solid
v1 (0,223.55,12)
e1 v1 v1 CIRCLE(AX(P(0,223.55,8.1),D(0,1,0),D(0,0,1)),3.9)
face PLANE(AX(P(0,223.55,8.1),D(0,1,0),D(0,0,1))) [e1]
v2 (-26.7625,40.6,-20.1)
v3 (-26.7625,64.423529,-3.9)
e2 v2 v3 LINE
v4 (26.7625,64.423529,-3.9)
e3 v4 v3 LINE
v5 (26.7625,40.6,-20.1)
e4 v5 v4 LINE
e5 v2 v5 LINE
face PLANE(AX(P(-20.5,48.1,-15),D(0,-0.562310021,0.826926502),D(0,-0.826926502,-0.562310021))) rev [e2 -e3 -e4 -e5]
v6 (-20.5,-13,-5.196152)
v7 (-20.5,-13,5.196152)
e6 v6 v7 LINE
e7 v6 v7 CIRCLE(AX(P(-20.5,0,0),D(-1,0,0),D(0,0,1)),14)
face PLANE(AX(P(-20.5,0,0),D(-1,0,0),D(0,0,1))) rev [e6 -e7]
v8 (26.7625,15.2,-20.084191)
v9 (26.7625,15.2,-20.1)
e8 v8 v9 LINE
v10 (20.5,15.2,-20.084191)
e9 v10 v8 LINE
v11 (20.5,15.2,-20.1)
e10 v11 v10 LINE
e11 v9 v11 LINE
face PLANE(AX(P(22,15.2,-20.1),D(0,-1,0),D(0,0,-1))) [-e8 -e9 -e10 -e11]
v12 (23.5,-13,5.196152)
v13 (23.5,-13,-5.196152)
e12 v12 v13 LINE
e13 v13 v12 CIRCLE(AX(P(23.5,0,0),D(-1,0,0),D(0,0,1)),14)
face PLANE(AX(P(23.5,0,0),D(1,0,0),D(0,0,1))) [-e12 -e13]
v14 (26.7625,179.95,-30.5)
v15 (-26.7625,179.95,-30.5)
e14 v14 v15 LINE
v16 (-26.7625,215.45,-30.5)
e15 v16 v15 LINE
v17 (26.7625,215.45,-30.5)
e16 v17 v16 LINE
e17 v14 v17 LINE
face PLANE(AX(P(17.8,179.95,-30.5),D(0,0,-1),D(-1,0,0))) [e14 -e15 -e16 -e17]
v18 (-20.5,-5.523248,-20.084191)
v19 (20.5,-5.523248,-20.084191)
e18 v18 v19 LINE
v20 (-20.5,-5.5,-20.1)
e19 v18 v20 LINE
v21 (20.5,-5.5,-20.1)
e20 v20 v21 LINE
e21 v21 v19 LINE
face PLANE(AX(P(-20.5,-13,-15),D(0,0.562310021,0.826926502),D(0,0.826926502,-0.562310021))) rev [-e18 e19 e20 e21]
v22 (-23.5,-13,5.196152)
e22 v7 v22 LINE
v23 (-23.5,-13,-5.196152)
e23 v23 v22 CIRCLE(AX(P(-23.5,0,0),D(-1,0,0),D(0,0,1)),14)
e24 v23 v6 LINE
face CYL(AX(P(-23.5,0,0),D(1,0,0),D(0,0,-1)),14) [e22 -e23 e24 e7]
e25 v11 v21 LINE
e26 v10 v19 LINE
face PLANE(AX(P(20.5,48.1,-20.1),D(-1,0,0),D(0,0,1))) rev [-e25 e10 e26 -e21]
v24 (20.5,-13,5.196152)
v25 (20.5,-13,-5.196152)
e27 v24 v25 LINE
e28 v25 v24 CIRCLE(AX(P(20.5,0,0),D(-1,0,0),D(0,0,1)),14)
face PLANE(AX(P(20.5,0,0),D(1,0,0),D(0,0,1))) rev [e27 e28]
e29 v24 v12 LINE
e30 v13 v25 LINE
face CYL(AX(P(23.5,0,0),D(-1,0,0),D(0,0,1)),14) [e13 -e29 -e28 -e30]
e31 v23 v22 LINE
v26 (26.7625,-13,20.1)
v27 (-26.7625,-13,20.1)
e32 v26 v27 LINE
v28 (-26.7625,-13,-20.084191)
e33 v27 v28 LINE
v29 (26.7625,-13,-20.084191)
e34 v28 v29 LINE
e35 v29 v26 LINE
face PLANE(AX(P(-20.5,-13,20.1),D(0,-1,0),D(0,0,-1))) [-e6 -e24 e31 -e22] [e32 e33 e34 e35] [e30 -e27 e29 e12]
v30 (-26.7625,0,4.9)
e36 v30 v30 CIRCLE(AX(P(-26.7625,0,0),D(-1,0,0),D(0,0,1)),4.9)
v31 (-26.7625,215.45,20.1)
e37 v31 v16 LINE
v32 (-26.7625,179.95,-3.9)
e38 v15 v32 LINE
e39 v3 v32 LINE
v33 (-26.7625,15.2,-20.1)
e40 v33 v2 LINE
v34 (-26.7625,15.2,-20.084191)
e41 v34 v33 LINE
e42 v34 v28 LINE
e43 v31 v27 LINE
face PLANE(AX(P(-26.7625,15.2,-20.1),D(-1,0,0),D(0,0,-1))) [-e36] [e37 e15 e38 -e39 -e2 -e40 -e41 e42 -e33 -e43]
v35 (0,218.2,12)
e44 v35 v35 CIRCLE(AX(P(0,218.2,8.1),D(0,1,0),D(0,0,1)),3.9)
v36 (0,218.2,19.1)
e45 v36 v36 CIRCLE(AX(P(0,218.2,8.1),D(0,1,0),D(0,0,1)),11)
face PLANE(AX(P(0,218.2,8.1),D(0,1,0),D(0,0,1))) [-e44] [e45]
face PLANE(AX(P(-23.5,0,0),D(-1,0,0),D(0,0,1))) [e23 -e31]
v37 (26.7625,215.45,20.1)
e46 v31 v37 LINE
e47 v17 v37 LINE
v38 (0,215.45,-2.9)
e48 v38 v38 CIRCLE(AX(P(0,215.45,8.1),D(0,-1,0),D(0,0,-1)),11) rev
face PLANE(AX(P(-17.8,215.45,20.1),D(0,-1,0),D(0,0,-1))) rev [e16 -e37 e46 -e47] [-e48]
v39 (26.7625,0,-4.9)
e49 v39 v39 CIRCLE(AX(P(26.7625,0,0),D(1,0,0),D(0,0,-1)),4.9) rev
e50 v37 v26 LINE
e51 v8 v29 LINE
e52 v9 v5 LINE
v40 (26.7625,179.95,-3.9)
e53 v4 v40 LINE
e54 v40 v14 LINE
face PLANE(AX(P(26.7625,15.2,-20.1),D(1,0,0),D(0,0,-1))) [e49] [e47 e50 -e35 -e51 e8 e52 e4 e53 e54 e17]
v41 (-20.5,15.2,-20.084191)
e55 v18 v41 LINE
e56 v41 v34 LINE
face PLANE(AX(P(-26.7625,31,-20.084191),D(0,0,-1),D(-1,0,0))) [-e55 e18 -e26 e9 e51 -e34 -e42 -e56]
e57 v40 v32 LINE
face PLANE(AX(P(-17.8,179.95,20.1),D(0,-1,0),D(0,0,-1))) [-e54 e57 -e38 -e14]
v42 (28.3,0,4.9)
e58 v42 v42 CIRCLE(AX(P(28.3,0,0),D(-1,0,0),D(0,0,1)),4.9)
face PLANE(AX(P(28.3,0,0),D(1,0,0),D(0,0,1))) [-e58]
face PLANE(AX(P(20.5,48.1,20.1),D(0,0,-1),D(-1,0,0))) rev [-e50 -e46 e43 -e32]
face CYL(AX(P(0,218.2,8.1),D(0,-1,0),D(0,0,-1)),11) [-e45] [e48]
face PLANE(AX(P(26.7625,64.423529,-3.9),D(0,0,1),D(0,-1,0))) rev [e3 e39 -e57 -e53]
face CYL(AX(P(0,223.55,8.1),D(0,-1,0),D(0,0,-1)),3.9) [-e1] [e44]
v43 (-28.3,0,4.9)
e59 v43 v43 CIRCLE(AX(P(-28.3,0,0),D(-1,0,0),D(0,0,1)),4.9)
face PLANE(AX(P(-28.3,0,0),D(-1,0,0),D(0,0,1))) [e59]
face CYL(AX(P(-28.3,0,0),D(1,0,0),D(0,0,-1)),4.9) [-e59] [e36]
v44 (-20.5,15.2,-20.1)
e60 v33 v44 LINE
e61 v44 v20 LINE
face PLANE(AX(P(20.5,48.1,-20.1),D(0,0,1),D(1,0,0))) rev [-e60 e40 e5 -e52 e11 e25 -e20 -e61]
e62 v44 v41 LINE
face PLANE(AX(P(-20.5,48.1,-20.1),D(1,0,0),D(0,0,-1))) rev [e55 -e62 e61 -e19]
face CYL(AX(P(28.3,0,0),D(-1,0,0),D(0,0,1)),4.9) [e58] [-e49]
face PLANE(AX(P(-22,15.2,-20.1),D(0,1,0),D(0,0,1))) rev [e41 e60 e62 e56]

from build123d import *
from OCP.BRepFilletAPI import BRepFilletAPI_MakeChamfer

# Parameters (mm, degrees)
SKETCH1_W            = 41
SKETCH1_H            = 40.2
BOSS_EXTRUDE1_DEPTH  = 61.1
SKETCH2_R            = 14
BOSS_EXTRUDE2_DEPTH  = 3
SKETCH3_R            = 4.9
BOSS_EXTRUDE3_DEPTH  = 4.8
CHAMFER1_SIZE        = 7.5
CHAMFER1_SIZE2       = 5.1
MIRROR5_START        = -20.5
MIRROR5_DEPTH        = 41
BOSS_EXTRUDE4_DEPTH  = 1.5
BOSS_EXTRUDE5_DEPTH  = 4.7625
SKETCH7_W            = 35.6
SKETCH7_H            = 50.6
BOSS_EXTRUDE6_DEPTH  = 35.5
SKETCH9_W            = 29.5
SKETCH9_H            = 35
BOSS_EXTRUDE7_DEPTH  = 39.8
SKETCH10_R           = 11
BOSS_EXTRUDE8_DEPTH  = 2.75
SKETCH11_R           = 3.9
BOSS_EXTRUDE9_DEPTH  = 5.35
SKETCH12_W           = 50.6
SKETCH12_H           = 35.5
BOSS_EXTRUDE10_DEPTH = 8.9625
SKETCH13_W           = 50.6
SKETCH13_H           = 35.5
BOSS_EXTRUDE11_DEPTH = 8.9625
SKETCH14_W           = 53.520973266
SKETCH14_H           = 24
BOSS_EXTRUDE12_DEPTH = 131.85
SKETCH15_W           = 53.525
SKETCH15_H           = 28.80973019
BOSS_EXTRUDE13_DEPTH = 10
SKETCH16_W           = 44
SKETCH16_H           = 7.5
BOSS_EXTRUDE14_DEPTH = 10
SKETCH17_W           = 53.525
SKETCH17_H           = 40.184191337
BOSS_EXTRUDE15_DEPTH = 44


# Read off the part's stored shape, not the designer's step: Mirror5
with BuildPart() as part:
    # Sketch1 → Boss-Extrude1 (new body)
    with BuildSketch(Plane(origin=(0, -13, 0), x_dir=(-1, 0, 0), z_dir=(0, 1, 0))):
        Rectangle(SKETCH1_W, SKETCH1_H)
    extrude(amount=BOSS_EXTRUDE1_DEPTH)

    # Sketch2 → Boss-Extrude2 (add)
    with BuildSketch(Plane.ZY.offset(20.5)):
        with Locations(Location((0, 0, 0), (0, 0, 248.213210702))):
            Circle(SKETCH2_R)
    boss_extrude2 = extrude(amount=BOSS_EXTRUDE2_DEPTH)

    # Sketch3 → Boss-Extrude3 (add)
    with BuildSketch(Plane.ZY.offset(23.5)):
        Circle(SKETCH3_R)
    boss_extrude3 = extrude(amount=BOSS_EXTRUDE3_DEPTH)

    # Chamfer1: one chamfer whose edges measure the first distance from different faces: ONE call of the kernel's chamfer builder (chamfer() names one face for all edges)
    chamfer1_edges_1 = [part.edges().sort_by_distance(p)[0] for p in [
        (0, 48.1, -20.1),
    ]]
    chamfer1_side_1 = [part.faces().sort_by_distance(p)[0] for p in [
        (0, 17.55, -20.1),
    ]]
    chamfer1_edges_2 = [part.edges().sort_by_distance(p)[0] for p in [
        (0, 48.1, 20.1),
    ]]
    chamfer1_side_2 = [part.faces().sort_by_distance(p)[0] for p in [
        (0, 17.55, 20.1),
    ]]
    chamfer1 = BRepFilletAPI_MakeChamfer(part.part.solid().wrapped)
    for e in chamfer1_edges_1:
        chamfer1.Add(CHAMFER1_SIZE, CHAMFER1_SIZE2, e.wrapped, chamfer1_side_1[0].wrapped)  # the first distance lies on this face
    for e in chamfer1_edges_2:
        chamfer1.Add(CHAMFER1_SIZE, CHAMFER1_SIZE2, e.wrapped, chamfer1_side_2[0].wrapped)  # the first distance lies on this face
    add(Compound.cast(chamfer1.Shape()), mode=Mode.REPLACE)

    # Mirror5 outline → Mirror5 (cut)
    with BuildSketch(Plane.YZ.offset(MIRROR5_START)):
        Polygon((-13, 20.1), (-13, 15), (-5.5, 20.1), align=None)
        Polygon((-5.5, -20.1), (-13, -15), (-13, -20.1), align=None)
    extrude(amount=MIRROR5_DEPTH, mode=Mode.SUBTRACT)

    # Sketch4 → Boss-Extrude4 (add)
    with BuildSketch(Plane.ZY.offset(20.5)):
        Polygon((-20.1, 15.2), (20.1, 15.2), (20.1, 40.6), (15, 48.1), (-15, 48.1), (-20.1, 40.6), align=None)
    boss_extrude4 = extrude(amount=BOSS_EXTRUDE4_DEPTH)

    # Mirror1: Boss-Extrude2, Boss-Extrude3, Boss-Extrude4 across plane
    add(boss_extrude2.mirror(Plane(origin=(0, 0, 0), x_dir=(0, 0, 1), z_dir=(1, 0, 0))))
    add(boss_extrude3.mirror(Plane(origin=(0, 0, 0), x_dir=(0, 0, 1), z_dir=(1, 0, 0))))
    add(boss_extrude4.mirror(Plane(origin=(0, 0, 0), x_dir=(0, 0, 1), z_dir=(1, 0, 0))))

    # Sketch6 → Boss-Extrude5 (add)
    with BuildSketch(Plane(origin=(22, 0, 0), x_dir=(0, 0, -1), z_dir=(1, 0, 0))):
        Polygon((20.1, 15.2), (20.1, 40.6), (3.9, 64.423529412), (3.9, 215.2), (-20.1, 215.2), (-20.1, 25.2), (4.9, 15.2), align=None)
    boss_extrude5 = extrude(amount=BOSS_EXTRUDE5_DEPTH)

    # Mirror2: Boss-Extrude5 across plane
    add(boss_extrude5.mirror(Plane(origin=(0, 0, 0), x_dir=(0, 0, 1), z_dir=(1, 0, 0))))



with BuildPart() as body_2:
    # Sketch7 → Boss-Extrude6 (new body)
    with BuildSketch(Plane(origin=(0, 215.45, 0), x_dir=(-1, 0, 0), z_dir=(0, 1, 0))):
        with Locations((0, -5.2)):
            Rectangle(SKETCH7_W, SKETCH7_H)
    extrude(amount=-BOSS_EXTRUDE6_DEPTH)


with BuildPart() as part_1:
    add(part.part)

    add(body_2.part)  # Boss-Extrude7 merges body 2
    # Sketch9 → Boss-Extrude7 (add)
    with BuildSketch(Plane.ZY.offset(-22)):
        with Locations((5.35, 197.7)):
            Rectangle(SKETCH9_W, SKETCH9_H)
    boss_extrude7 = extrude(amount=BOSS_EXTRUDE7_DEPTH)

    # Mirror3: Boss-Extrude7 across plane
    add(boss_extrude7.mirror(Plane(origin=(0, 0, 0), x_dir=(0, 0, 1), z_dir=(1, 0, 0))))

    # Sketch10 → Boss-Extrude8 (add)
    with BuildSketch(Plane(origin=(0, 215.45, 0), x_dir=(-1, 0, 0), z_dir=(0, 1, 0))):
        with Locations(Location((0, 8.1, 0), (0, 0, 270))):
            Circle(SKETCH10_R)
    extrude(amount=BOSS_EXTRUDE8_DEPTH)

    # Sketch11 → Boss-Extrude9 (add)
    with BuildSketch(Plane(origin=(0, 218.2, 0), x_dir=(-1, 0, 0), z_dir=(0, 1, 0))):
        with Locations(Location((0, 8.1, 0), (0, 0, 90))):
            Circle(SKETCH11_R)
    extrude(amount=BOSS_EXTRUDE9_DEPTH)

    # Sketch12 → Boss-Extrude10 (add)
    with BuildSketch(Plane(origin=(17.8, 0, 0), x_dir=(0, 0, -1), z_dir=(1, 0, 0))):
        with Locations((5.2, 197.7)):
            Rectangle(SKETCH12_W, SKETCH12_H)
    extrude(amount=BOSS_EXTRUDE10_DEPTH)

    # Sketch13 → Boss-Extrude11 (add)
    with BuildSketch(Plane.ZY.offset(17.8)):
        with Locations((-5.2, 197.7)):
            Rectangle(SKETCH13_W, SKETCH13_H)
    extrude(amount=BOSS_EXTRUDE11_DEPTH)

    # Sketch14 → Boss-Extrude12 (add)
    with BuildSketch(Plane.XZ.offset(-179.95)):
        with Locations((-0.002013367, 8.1)):
            Rectangle(SKETCH14_W, SKETCH14_H)
    extrude(amount=BOSS_EXTRUDE12_DEPTH)

    # Sketch15 → Boss-Extrude13 (add)
    with BuildSketch(Plane(origin=(0, 22.183698031, -32.623085339), x_dir=(-1, 0, 0), z_dir=(0, 0.562310021407278, -0.826926502069529))):
        with Locations((0, 36.675649649)):
            Rectangle(SKETCH15_W, SKETCH15_H)
    extrude(amount=-BOSS_EXTRUDE13_DEPTH)

    # Sketch16 → Boss-Extrude14 (add)
    with BuildSketch(Plane.XY.offset(20.1)):
        with Locations((0, 44.35)):
            Rectangle(SKETCH16_W, SKETCH16_H)
    extrude(amount=-BOSS_EXTRUDE14_DEPTH)

    # Sketch17 → Boss-Extrude15 (add)
    with BuildSketch(Plane.XZ.offset(13)):
        with Locations((0, 0.007904332)):
            Rectangle(SKETCH17_W, SKETCH17_H)
    extrude(amount=-BOSS_EXTRUDE15_DEPTH)


solid = part_1.part
